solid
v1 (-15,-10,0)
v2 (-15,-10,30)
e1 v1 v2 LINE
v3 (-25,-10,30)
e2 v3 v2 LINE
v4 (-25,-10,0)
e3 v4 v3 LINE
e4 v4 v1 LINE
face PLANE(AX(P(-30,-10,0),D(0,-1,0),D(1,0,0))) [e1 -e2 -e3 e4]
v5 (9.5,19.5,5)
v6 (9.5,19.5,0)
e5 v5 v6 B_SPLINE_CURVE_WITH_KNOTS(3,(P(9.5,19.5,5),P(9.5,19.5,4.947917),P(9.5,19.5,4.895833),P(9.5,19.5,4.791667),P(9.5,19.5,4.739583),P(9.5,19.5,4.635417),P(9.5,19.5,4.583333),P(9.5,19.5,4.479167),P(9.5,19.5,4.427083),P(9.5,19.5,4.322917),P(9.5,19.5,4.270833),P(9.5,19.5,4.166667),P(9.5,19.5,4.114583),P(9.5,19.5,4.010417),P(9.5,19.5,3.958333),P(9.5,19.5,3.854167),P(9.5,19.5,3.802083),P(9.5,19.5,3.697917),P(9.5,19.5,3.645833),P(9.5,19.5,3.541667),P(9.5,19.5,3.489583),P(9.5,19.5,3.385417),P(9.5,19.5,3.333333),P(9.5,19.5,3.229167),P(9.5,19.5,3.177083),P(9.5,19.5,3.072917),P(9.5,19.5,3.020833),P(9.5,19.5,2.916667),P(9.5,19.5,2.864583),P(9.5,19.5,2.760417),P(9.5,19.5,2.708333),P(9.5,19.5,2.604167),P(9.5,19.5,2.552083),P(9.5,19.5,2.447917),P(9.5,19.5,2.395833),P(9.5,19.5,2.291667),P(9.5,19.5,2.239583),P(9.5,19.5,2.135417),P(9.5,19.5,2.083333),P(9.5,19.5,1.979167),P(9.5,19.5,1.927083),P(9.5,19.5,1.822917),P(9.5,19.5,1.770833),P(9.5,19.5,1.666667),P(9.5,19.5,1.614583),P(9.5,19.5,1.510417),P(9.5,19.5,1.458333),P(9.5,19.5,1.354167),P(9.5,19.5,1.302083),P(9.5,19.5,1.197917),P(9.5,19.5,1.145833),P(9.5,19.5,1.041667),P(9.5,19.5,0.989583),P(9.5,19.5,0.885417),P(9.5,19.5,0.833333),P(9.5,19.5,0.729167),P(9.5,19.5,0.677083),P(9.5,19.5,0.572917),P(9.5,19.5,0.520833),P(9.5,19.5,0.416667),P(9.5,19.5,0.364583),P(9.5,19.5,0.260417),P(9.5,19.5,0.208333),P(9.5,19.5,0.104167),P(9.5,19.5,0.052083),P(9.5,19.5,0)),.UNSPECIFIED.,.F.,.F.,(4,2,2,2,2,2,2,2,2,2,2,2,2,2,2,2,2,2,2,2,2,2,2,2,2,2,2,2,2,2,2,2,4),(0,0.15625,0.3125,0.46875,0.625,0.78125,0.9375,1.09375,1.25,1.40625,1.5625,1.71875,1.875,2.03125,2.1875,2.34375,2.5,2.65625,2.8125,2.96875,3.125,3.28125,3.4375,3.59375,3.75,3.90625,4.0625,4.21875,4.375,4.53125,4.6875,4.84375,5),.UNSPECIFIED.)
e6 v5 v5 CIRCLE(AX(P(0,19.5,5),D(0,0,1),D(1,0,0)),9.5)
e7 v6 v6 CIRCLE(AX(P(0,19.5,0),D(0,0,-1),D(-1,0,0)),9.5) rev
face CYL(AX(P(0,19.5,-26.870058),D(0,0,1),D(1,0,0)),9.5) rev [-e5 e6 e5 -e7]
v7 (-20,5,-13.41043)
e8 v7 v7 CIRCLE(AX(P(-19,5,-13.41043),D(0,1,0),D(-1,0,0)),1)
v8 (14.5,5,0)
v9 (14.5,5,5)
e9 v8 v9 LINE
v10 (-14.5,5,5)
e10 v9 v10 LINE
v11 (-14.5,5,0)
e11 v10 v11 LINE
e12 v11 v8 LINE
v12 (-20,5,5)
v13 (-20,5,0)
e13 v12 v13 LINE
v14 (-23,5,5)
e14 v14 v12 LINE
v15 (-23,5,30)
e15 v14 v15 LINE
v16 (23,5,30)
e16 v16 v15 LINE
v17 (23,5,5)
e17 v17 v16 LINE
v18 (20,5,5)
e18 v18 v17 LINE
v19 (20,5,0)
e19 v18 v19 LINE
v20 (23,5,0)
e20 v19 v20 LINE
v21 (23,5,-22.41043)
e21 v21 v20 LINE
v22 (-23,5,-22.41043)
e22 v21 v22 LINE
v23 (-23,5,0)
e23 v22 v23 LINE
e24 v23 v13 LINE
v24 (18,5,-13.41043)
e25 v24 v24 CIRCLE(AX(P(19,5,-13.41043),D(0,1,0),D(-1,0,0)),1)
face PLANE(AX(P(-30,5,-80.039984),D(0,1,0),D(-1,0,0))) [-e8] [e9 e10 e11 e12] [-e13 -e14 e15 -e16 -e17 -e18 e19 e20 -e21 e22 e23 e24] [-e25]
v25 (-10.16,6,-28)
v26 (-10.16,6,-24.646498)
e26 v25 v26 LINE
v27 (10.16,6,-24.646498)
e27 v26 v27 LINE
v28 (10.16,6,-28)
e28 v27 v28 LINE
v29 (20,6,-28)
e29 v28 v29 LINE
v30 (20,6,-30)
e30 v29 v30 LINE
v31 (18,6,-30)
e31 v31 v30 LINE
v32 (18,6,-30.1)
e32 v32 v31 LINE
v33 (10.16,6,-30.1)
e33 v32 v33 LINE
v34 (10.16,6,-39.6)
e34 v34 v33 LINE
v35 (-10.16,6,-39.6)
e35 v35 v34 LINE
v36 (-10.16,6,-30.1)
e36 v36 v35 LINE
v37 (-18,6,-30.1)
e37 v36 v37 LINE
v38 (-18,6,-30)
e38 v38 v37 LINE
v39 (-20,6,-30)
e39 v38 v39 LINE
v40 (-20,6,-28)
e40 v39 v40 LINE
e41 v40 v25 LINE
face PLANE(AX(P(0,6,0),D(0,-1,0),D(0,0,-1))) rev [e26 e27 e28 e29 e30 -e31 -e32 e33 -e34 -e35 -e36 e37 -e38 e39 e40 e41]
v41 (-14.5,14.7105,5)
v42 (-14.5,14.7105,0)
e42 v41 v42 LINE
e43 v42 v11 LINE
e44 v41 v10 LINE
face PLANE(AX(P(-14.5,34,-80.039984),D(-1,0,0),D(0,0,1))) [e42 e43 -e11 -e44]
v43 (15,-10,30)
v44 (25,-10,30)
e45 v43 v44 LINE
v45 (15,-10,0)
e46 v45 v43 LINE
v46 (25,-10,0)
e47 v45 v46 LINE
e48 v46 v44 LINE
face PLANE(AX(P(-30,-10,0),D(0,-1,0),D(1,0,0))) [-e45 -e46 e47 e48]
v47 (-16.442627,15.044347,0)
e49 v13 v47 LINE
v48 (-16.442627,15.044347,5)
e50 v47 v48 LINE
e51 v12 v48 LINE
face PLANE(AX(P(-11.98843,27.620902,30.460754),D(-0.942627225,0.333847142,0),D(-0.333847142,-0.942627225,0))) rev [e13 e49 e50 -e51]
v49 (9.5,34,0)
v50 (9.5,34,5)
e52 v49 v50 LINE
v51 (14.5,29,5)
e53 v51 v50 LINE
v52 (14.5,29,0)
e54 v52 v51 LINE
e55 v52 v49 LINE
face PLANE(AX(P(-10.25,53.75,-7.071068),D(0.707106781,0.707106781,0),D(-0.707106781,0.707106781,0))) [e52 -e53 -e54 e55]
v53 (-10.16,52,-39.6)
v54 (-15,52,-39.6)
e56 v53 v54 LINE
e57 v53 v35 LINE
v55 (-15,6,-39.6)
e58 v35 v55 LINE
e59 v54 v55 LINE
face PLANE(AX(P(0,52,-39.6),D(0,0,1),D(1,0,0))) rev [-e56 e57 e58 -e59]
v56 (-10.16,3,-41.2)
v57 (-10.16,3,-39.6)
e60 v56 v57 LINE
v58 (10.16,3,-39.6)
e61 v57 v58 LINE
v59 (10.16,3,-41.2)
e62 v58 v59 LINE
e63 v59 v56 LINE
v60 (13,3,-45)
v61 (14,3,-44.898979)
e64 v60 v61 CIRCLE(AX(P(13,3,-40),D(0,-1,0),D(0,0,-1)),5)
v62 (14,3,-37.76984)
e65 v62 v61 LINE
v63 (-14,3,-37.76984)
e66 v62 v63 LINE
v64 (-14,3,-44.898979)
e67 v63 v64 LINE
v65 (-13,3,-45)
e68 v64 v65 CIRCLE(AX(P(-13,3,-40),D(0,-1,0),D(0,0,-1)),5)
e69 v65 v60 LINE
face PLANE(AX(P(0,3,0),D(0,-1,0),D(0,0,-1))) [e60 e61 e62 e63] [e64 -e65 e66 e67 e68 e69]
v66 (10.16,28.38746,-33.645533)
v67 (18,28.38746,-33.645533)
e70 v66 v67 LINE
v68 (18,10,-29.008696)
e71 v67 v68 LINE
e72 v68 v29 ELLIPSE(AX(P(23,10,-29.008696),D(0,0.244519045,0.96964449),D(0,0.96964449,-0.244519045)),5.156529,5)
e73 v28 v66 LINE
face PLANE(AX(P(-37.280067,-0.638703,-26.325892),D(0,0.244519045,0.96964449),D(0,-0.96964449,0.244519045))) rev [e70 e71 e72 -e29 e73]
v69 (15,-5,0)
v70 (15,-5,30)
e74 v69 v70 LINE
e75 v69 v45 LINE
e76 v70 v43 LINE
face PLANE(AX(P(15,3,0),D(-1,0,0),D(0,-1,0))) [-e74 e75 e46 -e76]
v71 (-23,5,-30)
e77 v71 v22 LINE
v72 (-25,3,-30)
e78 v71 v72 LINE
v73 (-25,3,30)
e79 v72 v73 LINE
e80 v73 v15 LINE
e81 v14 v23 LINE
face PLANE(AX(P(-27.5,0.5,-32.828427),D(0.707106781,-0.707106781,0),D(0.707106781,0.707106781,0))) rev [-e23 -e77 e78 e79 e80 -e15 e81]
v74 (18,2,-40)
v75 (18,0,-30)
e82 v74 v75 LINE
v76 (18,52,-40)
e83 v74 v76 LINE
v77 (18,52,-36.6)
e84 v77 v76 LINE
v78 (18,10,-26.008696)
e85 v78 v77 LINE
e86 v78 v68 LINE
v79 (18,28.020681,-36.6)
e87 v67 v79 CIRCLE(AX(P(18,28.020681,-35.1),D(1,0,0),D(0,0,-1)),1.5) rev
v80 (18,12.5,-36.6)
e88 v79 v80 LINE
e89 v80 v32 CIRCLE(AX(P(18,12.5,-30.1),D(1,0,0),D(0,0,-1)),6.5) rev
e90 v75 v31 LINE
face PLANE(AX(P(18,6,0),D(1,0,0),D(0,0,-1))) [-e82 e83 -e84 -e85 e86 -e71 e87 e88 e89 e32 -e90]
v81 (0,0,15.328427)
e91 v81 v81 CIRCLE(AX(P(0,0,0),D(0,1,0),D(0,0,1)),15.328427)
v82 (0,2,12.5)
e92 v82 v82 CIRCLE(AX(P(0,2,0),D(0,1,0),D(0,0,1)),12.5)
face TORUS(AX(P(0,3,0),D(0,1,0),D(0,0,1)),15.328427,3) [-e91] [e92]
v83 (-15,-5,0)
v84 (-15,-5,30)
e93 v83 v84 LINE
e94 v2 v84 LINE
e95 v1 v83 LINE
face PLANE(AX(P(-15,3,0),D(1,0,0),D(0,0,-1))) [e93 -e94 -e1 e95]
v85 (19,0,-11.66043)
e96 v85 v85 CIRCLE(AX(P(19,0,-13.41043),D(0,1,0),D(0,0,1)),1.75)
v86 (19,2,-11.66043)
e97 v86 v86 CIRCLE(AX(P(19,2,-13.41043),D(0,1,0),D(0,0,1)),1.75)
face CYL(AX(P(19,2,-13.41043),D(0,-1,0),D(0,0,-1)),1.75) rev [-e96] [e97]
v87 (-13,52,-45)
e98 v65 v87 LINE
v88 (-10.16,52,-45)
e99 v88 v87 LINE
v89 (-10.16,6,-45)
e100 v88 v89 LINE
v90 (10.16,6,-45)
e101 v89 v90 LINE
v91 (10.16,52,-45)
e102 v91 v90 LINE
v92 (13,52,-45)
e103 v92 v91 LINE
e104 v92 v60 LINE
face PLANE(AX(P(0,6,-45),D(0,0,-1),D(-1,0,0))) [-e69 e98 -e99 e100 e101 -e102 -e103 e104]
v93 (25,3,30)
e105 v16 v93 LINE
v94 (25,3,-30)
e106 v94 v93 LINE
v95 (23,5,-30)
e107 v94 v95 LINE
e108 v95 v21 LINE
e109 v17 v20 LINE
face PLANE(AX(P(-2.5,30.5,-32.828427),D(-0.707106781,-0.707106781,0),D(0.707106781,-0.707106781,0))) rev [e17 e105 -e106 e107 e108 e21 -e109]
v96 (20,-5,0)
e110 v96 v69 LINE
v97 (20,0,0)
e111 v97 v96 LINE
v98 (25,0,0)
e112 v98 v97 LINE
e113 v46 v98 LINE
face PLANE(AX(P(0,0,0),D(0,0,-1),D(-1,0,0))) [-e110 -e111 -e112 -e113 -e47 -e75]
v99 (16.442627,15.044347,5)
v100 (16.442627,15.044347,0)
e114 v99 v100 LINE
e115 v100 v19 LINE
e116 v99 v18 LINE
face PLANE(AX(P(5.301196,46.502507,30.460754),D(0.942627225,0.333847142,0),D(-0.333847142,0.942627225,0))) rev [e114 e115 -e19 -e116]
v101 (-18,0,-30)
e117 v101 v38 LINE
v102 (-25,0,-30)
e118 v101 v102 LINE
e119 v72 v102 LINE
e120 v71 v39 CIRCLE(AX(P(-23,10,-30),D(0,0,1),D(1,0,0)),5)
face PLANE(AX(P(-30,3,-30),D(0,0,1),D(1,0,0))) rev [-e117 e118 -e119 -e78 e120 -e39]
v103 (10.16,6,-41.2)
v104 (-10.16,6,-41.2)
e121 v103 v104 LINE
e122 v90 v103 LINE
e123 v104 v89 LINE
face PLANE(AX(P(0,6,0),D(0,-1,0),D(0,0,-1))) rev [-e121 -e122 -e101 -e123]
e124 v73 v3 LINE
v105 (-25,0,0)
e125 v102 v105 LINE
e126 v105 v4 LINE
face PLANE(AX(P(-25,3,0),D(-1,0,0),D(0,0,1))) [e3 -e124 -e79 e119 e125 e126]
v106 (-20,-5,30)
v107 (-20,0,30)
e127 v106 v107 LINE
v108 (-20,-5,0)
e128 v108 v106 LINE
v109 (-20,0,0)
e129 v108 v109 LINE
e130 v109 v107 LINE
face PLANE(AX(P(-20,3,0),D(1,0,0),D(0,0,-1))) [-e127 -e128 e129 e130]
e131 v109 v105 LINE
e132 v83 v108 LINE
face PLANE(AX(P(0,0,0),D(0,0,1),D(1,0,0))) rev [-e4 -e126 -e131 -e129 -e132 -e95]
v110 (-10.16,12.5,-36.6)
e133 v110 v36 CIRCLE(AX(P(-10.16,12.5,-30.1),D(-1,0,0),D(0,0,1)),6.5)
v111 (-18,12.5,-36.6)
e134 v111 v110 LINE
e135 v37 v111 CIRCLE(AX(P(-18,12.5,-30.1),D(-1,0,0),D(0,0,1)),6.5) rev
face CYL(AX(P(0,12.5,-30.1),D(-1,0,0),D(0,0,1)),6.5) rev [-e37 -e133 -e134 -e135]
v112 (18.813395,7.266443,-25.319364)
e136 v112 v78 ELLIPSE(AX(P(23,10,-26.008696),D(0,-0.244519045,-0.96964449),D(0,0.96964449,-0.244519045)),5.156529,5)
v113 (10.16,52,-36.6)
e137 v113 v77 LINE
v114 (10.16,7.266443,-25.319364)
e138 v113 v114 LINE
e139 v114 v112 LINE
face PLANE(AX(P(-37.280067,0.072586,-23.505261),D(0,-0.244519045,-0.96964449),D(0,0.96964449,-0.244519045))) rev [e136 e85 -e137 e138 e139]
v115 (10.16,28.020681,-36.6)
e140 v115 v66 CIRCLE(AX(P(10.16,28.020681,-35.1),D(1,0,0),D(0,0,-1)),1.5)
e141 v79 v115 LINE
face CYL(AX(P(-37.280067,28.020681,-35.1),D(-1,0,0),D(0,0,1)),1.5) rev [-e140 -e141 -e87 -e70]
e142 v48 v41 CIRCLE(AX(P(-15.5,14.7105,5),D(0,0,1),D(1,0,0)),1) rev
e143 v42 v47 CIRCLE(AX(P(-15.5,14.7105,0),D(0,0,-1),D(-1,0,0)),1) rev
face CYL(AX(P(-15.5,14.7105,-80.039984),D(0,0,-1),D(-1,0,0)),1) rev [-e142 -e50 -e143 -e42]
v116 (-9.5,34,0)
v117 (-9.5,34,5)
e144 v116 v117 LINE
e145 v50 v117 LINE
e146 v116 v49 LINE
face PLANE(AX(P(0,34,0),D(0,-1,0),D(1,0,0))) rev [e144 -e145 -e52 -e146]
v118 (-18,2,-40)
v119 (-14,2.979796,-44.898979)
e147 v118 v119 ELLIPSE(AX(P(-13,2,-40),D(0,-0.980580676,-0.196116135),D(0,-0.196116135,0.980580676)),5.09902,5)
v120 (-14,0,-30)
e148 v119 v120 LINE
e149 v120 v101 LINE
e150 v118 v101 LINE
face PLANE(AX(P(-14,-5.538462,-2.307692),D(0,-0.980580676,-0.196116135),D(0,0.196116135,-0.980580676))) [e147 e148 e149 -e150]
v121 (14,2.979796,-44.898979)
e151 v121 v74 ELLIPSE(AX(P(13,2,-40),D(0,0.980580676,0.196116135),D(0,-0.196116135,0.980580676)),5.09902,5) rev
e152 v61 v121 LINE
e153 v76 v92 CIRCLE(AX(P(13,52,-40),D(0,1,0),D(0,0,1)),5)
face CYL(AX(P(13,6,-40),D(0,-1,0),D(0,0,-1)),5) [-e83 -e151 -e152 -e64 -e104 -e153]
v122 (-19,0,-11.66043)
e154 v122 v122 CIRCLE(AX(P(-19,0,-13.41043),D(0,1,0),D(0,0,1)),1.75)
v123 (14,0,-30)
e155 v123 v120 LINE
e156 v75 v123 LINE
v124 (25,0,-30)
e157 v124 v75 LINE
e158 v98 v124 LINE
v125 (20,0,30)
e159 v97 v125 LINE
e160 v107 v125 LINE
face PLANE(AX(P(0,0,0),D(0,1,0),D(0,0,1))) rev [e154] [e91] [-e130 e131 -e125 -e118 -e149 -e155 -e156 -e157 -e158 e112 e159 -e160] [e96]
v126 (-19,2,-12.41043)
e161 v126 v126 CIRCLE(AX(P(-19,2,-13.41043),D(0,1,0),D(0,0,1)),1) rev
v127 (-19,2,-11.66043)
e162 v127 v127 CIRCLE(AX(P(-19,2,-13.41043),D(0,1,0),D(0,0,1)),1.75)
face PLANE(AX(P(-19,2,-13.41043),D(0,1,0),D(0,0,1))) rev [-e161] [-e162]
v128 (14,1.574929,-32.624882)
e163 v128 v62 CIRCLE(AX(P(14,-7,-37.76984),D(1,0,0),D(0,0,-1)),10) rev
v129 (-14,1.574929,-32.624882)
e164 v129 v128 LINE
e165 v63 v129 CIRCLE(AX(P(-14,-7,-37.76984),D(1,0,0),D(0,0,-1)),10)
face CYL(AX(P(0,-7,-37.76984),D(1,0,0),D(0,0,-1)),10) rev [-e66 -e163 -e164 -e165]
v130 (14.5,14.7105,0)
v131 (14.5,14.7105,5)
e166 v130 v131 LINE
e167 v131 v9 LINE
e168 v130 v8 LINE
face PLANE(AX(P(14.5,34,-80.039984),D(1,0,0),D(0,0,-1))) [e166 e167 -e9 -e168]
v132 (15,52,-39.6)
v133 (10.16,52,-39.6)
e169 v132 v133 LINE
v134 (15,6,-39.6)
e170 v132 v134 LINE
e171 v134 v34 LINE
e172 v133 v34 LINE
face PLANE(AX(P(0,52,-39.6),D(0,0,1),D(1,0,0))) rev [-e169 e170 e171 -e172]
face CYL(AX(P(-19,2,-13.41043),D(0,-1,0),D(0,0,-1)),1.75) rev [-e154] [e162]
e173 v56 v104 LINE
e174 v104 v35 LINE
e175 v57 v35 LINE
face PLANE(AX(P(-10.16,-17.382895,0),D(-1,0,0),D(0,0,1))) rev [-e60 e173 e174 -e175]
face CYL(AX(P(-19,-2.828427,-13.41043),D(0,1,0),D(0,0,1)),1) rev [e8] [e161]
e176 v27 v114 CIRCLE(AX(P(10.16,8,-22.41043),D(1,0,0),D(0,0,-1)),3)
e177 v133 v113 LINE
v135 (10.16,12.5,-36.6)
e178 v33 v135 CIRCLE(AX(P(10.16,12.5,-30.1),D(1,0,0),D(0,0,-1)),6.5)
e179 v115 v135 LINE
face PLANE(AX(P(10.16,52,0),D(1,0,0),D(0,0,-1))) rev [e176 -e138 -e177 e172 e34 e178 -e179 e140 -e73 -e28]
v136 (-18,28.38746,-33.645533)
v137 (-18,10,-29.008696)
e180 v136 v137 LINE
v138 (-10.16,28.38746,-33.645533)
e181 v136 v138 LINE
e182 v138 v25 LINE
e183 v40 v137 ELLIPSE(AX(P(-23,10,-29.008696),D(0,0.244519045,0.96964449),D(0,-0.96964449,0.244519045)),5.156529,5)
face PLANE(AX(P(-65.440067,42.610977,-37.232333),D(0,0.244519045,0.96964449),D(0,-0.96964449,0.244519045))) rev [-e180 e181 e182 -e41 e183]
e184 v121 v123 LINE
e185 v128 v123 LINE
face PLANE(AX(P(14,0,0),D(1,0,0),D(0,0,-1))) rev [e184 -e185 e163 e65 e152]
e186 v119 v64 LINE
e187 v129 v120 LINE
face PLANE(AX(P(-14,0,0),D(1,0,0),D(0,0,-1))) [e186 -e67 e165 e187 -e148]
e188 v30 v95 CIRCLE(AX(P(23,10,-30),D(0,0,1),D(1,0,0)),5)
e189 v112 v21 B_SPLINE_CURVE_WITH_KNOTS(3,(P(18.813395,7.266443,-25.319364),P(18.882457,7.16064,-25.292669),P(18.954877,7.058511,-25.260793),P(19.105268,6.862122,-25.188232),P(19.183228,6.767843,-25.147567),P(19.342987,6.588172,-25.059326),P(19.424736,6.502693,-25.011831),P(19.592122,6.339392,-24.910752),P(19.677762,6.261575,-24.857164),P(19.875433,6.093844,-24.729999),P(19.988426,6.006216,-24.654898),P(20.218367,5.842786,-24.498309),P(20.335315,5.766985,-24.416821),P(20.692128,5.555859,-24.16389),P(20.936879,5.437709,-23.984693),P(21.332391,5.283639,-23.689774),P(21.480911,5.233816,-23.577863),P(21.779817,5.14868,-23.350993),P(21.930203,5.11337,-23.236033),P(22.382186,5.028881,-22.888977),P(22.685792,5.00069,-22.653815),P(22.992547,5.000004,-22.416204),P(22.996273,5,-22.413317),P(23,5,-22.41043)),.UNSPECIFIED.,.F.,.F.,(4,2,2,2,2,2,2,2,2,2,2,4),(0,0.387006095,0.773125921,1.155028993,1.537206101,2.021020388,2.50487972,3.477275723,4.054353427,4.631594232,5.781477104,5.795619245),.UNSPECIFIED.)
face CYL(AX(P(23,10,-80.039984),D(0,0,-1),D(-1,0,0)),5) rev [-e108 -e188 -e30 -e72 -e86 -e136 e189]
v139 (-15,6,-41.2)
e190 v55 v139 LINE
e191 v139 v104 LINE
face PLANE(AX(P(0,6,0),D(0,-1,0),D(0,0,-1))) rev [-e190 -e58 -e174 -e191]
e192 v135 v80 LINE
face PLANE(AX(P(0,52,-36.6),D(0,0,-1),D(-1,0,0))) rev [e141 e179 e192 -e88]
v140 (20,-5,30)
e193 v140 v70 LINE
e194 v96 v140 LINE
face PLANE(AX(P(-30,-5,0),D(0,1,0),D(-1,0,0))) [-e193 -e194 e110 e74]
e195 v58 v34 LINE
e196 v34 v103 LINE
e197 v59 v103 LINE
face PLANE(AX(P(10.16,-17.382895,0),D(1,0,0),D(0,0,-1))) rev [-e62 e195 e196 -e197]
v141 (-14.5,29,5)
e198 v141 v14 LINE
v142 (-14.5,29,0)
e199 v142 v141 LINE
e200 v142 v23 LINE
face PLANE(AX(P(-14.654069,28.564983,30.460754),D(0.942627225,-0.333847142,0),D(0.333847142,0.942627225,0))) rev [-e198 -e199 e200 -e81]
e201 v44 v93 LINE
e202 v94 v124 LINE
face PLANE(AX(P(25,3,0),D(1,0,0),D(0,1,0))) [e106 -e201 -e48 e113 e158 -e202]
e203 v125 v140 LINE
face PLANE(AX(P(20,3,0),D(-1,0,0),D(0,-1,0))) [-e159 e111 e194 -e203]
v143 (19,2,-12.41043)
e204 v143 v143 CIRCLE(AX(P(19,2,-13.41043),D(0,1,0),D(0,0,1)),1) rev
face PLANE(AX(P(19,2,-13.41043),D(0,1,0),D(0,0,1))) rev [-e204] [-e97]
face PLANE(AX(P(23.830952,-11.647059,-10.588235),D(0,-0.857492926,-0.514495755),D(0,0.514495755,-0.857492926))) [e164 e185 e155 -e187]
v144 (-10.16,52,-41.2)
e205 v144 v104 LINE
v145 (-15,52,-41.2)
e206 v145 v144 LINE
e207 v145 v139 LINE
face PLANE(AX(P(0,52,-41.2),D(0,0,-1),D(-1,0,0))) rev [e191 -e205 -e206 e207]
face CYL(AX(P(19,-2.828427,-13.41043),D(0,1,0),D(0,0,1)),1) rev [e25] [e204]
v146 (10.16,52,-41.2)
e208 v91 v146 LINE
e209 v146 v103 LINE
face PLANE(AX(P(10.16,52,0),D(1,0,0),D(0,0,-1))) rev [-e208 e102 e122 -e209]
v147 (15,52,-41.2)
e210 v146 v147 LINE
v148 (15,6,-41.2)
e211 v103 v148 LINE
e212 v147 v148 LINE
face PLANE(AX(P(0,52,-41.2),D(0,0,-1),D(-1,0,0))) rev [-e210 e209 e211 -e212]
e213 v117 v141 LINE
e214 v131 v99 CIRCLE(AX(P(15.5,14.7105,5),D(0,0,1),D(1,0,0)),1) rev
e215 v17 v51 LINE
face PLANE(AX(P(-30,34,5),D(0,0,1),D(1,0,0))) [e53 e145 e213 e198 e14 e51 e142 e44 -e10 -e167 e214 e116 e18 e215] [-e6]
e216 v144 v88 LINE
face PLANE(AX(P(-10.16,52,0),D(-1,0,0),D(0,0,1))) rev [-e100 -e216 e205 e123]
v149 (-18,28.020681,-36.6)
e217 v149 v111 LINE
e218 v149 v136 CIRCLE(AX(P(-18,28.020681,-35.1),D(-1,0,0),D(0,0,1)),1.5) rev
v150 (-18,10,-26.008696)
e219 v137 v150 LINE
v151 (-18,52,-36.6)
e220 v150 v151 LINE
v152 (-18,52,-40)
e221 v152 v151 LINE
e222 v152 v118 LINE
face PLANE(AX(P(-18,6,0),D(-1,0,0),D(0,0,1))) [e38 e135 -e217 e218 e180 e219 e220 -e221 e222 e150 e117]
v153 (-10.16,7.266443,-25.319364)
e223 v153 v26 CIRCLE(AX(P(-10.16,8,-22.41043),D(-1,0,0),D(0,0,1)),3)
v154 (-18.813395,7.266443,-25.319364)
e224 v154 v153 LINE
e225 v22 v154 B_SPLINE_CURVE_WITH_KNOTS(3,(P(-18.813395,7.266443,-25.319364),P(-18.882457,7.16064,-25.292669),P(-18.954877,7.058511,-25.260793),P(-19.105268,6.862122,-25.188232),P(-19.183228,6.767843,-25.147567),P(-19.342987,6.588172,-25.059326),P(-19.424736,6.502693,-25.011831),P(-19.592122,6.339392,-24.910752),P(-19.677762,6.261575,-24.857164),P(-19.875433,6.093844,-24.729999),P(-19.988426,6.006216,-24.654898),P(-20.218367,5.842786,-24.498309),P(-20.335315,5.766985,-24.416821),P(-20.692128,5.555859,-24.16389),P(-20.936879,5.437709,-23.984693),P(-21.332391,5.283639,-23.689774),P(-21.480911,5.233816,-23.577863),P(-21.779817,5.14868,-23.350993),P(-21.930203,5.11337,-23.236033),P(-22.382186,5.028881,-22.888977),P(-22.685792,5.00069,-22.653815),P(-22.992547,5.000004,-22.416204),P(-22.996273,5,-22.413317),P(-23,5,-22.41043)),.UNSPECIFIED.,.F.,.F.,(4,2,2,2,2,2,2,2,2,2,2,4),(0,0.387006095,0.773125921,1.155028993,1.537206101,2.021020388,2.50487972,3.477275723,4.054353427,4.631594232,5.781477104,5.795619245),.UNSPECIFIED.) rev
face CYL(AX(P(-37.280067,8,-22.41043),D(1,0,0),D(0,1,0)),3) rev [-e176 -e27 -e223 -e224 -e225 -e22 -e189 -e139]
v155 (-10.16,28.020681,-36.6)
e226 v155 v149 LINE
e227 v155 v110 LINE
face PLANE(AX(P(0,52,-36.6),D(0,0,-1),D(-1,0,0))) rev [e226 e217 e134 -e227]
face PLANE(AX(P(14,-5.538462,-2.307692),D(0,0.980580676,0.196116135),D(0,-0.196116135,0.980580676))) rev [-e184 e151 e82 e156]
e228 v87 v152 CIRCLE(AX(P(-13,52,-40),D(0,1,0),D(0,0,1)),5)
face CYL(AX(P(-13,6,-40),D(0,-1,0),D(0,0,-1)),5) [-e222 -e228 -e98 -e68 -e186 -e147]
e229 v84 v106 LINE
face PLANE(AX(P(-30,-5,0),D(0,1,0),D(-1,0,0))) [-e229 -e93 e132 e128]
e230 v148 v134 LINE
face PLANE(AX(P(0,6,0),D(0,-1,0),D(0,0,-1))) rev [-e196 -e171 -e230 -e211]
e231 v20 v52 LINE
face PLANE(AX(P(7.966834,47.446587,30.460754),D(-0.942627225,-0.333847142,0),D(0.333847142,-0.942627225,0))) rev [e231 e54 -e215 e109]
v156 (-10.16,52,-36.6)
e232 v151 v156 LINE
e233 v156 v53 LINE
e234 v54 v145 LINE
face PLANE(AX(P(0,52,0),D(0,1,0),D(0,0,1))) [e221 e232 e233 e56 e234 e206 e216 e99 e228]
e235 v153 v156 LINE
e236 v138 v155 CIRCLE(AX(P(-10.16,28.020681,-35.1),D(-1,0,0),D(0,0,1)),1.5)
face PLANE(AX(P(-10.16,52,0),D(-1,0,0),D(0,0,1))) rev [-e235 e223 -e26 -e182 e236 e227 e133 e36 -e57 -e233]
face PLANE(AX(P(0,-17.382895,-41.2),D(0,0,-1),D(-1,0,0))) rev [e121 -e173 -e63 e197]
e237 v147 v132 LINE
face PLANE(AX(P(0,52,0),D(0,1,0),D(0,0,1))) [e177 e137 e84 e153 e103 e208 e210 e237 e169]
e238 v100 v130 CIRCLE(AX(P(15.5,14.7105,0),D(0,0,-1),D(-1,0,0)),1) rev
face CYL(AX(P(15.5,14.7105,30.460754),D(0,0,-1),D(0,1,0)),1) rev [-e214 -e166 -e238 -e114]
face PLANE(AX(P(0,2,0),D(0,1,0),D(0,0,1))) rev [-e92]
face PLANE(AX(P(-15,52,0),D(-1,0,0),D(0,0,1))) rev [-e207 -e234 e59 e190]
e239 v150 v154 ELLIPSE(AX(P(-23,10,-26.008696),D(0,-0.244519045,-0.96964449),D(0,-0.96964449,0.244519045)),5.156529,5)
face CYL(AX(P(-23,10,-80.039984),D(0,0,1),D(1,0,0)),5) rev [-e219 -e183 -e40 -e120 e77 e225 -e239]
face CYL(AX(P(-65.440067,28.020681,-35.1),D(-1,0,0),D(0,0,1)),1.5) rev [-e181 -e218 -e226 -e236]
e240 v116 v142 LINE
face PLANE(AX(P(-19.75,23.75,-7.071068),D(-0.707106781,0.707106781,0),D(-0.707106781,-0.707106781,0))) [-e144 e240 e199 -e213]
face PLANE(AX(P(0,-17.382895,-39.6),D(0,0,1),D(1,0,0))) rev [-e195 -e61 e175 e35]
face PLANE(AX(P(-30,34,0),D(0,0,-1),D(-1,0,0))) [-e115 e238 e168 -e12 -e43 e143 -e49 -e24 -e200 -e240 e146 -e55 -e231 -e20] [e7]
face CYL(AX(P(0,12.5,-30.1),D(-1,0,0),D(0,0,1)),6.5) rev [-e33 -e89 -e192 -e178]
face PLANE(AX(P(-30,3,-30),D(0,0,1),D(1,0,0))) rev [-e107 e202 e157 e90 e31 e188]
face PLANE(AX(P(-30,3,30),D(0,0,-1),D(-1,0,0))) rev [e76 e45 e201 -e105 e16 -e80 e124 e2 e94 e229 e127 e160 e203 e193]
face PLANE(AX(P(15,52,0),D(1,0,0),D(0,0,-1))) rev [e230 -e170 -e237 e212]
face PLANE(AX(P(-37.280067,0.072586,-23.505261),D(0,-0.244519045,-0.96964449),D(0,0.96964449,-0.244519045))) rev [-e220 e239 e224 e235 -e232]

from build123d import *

# Parameters (mm, degrees)
SKETCH_2_W           = 60
SKETCH_2_H           = 60
EXTRUDE_1_DEPTH      = 3
EXTRUDE_START        = 30
EXTRUDE_3_DEPTH      = 30
EXTRUDE_START_2      = 3
SKETCH_8_W           = 36
SKETCH_8_H           = 20
EXTRUDE_4_DEPTH      = 3
CUT_EXTRUDE_START    = 6
SKETCH_10_W          = 20.32
SKETCH_10_H          = 1.6
CUT_EXTRUDE_2_DEPTH  = 3
EXTRUDE_START_3      = 6
EXTRUDE_5_DEPTH      = 46
EXTRUDE_START_4      = -18
EXTRUDE_6_DEPTH      = 36
EXTRUDE_START_5      = 18
EXTRUDE_8_DEPTH      = 7.84
EXTRUDE_START_6      = -10.16
EXTRUDE_9_DEPTH      = 7.84
EXTRUDE_10_DEPTH     = 36
SKETCH_16_W          = 5
SKETCH_16_H          = 60
CUT_EXTRUDE_3_DEPTH  = 3
EXTRUDE_11_DEPTH     = 4
EXTRUDE_12_DEPTH     = 4
FILLET_3_R           = 5
FILLET_4_R           = 10
SKETCH_22_W          = 50
SKETCH_22_H          = 2
EXTRUDE_14_DEPTH     = 60
CUT_EXTRUDE_START_2  = 30
CUT_EXTRUDE_4_DEPTH  = 60
SKETCH_26_R          = 12.5
CUT_EXTRUDE_6_DEPTH  = 2
FILLET_5_R           = 3
FILLET_7_R           = 5
FILLET_8_R           = 6.5
FILLET_9_R           = 1.5
FILLET_10_R          = 3
EXTRUDE_START_7      = 5
SKETCH_27_W          = 29
SKETCH_27_H          = 5
EXTRUDE_15_DEPTH     = 29
CUT_EXTRUDE_START_3  = 5
SKETCH_28_R          = 9.5
CUT_EXTRUDE_7_DEPTH  = 5
CUT_EXTRUDE_8_DEPTH  = 5
EXTRUDE_16_DEPTH     = 5
FILLET_11_R          = 1
SKETCH_31_R          = 1
CUT_EXTRUDE_9_DEPTH  = 5
SKETCH_32_R          = 1.75
CUT_EXTRUDE_10_DEPTH = 2


with BuildPart() as part:
    # 草图2 → 凸台-拉伸1 (new body)
    with BuildSketch(Plane(origin=(0, 0, 0), x_dir=(1, 0, 0), z_dir=(0, 1, 0))):
        Rectangle(SKETCH_2_W, SKETCH_2_H)
    extrude(amount=EXTRUDE_1_DEPTH)

    # 草图7 → 凸台-拉伸3 (add)
    with BuildSketch(Plane.XY.offset(EXTRUDE_START)):
        Polygon((-25, 0), (-25, -10), (-15, -10), (-15, -5), (-20, -5), (-20, 0), align=None)
        Polygon((20, 0), (25, 0), (25, -10), (15, -10), (15, -5), (20, -5), align=None)
    extrude(amount=-EXTRUDE_3_DEPTH)

    # 草图8 → 凸台-拉伸4 (add)
    with BuildSketch(Plane(origin=(0, 0, 0), x_dir=(1, 0, 0), z_dir=(0, 1, 0)).offset(EXTRUDE_START_2)):
        with Locations((0, 35)):
            Rectangle(SKETCH_8_W, SKETCH_8_H)
    extrude(amount=EXTRUDE_4_DEPTH)

    # 草图10 → 切除-拉伸2 (cut)
    with BuildSketch(Plane(origin=(0, 0, 0), x_dir=(1, 0, 0), z_dir=(0, 1, 0)).offset(CUT_EXTRUDE_START)):
        with Locations((0, 40.4)):
            Rectangle(SKETCH_10_W, SKETCH_10_H)
    extrude(amount=-CUT_EXTRUDE_2_DEPTH, mode=Mode.SUBTRACT)

    # 草图11 → 凸台-拉伸5 (add)
    with BuildSketch(Plane(origin=(0, 0, 0), x_dir=(1, 0, 0), z_dir=(0, 1, 0)).offset(EXTRUDE_START_3)):
        Polygon((10.16, 41.2), (10.16, 45), (18, 45), (18, 36.6), (10.16, 36.6), (10.16, 39.6), (15, 39.6), (15, 41.2), align=None)
        Polygon((-15, 41.2), (-15, 39.6), (-10.16, 39.6), (-10.16, 36.6), (-18, 36.6), (-18, 45), (-10.16, 45), (-10.16, 41.2), align=None)
    extrude(amount=EXTRUDE_5_DEPTH)

    # 草图12 → 凸台-拉伸6 (add)
    with BuildSketch(Plane(origin=(0, 0, 0), x_dir=(0, 0, -1), z_dir=(1, 0, 0)).offset(EXTRUDE_START_4)):
        Polygon((30, 0), (35, 3), (30, 3), align=None)
    extrude(amount=EXTRUDE_6_DEPTH)

    # 草图13 → 凸台-拉伸8 (add)
    with BuildSketch(Plane(origin=(0, 0, 0), x_dir=(0, 0, -1), z_dir=(1, 0, 0)).offset(EXTRUDE_START_5)):
        Polygon((25, 6), (36.6, 52), (36.6, 40.103448276), (28, 6), align=None)
    extrude(amount=-EXTRUDE_8_DEPTH)

    # 草图14 → 凸台-拉伸9 (add)
    with BuildSketch(Plane(origin=(0, 0, 0), x_dir=(0, 0, -1), z_dir=(1, 0, 0)).offset(EXTRUDE_START_6)):
        Polygon((36.6, 52), (25, 6), (28, 6), (36.6, 40.103448276), align=None)
    extrude(amount=-EXTRUDE_9_DEPTH)

    # 草图15 → 凸台-拉伸10 (add)
    with BuildSketch(Plane(origin=(0, 0, 0), x_dir=(0, 0, -1), z_dir=(1, 0, 0)).offset(EXTRUDE_START_4)):
        Polygon((25, 3), (24.243478261, 3), (25, 6), align=None)
    extrude(amount=EXTRUDE_10_DEPTH)

    # 草图16 → 切除-拉伸3 (cut)
    with BuildSketch(Plane(origin=(0, 0, 0), x_dir=(1, 0, 0), z_dir=(0, 1, 0))):
        with Locations((27.5, 0)):
            Rectangle(SKETCH_16_W, SKETCH_16_H)
        with Locations((-27.5, 0)):
            Rectangle(SKETCH_16_W, SKETCH_16_H)
    extrude(amount=CUT_EXTRUDE_3_DEPTH, mode=Mode.SUBTRACT)

    # 草图17 → 凸台-拉伸11 (add)
    with BuildSketch(Plane(origin=(0, 0, 0), x_dir=(0, 0, -1), z_dir=(1, 0, 0)).offset(EXTRUDE_START_5)):
        Polygon((30, 0), (45, 3), (30, 3), align=None)
    extrude(amount=-EXTRUDE_11_DEPTH)

    # 草图18 → 凸台-拉伸12 (add)
    with BuildSketch(Plane(origin=(0, 0, 0), x_dir=(0, 0, -1), z_dir=(1, 0, 0)).offset(EXTRUDE_START_4)):
        Polygon((30, 0), (30, 3), (45, 3), align=None)
    extrude(amount=EXTRUDE_12_DEPTH)

    # 圆角3
    # the kernel refuses this fillet: 5 mm, written as the material it takes off along each edge
    with BuildSketch(Plane(origin=(18, -9.5, -45), x_dir=(0, 0, 1), z_dir=(0, 1, 0)), Plane(origin=(-18, 64.5, -45), x_dir=(0, 0, 1), z_dir=(0, -1, 0))) as fillet_3_piece_1:
        with BuildLine():
            CenterArc((FILLET_3_R, -FILLET_3_R), FILLET_3_R, 90, 90)
            Line((0, -FILLET_3_R), (0, 0))
            Line((0, 0), (FILLET_3_R, 0))
        make_face()
    extrude(amount=74, mode=Mode.SUBTRACT)

    # 圆角4
    fillet_4_edges = [part.edges().sort_by_distance(p)[0] for p in [
        (0, 3, -35),
    ]]
    fillet(fillet_4_edges, radius=FILLET_4_R)

    # 草图22 → 凸台-拉伸14 (add)
    with BuildSketch(Plane.XY.offset(EXTRUDE_START)):
        with Locations((0, 4)):
            Rectangle(SKETCH_22_W, SKETCH_22_H)
    extrude(amount=-EXTRUDE_14_DEPTH)

    # 草图24 → 切除-拉伸4 (cut)
    with BuildSketch(Plane.XY.offset(CUT_EXTRUDE_START_2)):
        Polygon((-25, 5), (-23, 5), (-25, 3), align=None)
        Polygon((25, 5), (25, 3), (23, 5), align=None)
    extrude(amount=-CUT_EXTRUDE_4_DEPTH, mode=Mode.SUBTRACT)

    # 草图26 → 切除-拉伸6 (cut)
    with BuildSketch(Plane(origin=(0, 0, 0), x_dir=(1, 0, 0), z_dir=(0, 1, 0))):
        with Locations(Location((0, 0, 0), (0, 0, 270))):
            Circle(SKETCH_26_R)
    extrude(amount=CUT_EXTRUDE_6_DEPTH, mode=Mode.SUBTRACT)

    # 圆角5
    # the kernel refuses this fillet: 3 mm, written as the material it takes off along each edge
    with BuildSketch(Plane(origin=(0, 0, 0), x_dir=(0, 0, 1), z_dir=(-1, 0, 0))) as fillet_5_piece_1:
        with BuildLine():
            CenterArc((15.328427125, 3), FILLET_5_R, 199.471220634, 70.528779366)
            Line((12.5, 2), (12.443431458, 1.98))
            ThreePointArc((12.443431458, 1.98), (12.44, 1), (12.44, 0))
            Line((12.44, 0), (12.5, -0.06))
            Line((12.5, -0.06), (15.328427125, -0.06))
            Line((15.328427125, -0.06), (15.328427125, 0))
        make_face()
    revolve(axis=Axis((0, 0, 0), (0, 1, 0)), mode=Mode.SUBTRACT)

    # 圆角7
    # the kernel refuses this fillet: 5 mm, written as the material it adds along each edge
    with BuildSketch(Plane(origin=(-18, 5, -12.247826087), x_dir=(0, 1, 0), z_dir=(0, 0, -1))) as fillet_7_piece_1_section:
        with BuildLine():
            CenterArc((FILLET_7_R, -FILLET_7_R), FILLET_7_R, 90, 90)
            Line((0, -FILLET_7_R), (0, 0))
            Line((0, 0), (FILLET_7_R, 0))
        make_face()
    fillet_7_piece_1 = extrude(amount=30.252173913, mode=Mode.PRIVATE)
    fillet_7_piece_1 = split(fillet_7_piece_1, bisect_by=Plane(origin=(-18.571810287, 7.311264389, -25.330666672), z_dir=(0, -0.24451904524274018, -0.9696444897556934)), keep=Keep.TOP, mode=Mode.PRIVATE)
    fillet_7_piece_1 = split(fillet_7_piece_1, bisect_by=Plane(origin=(-18.571810287, 6.599974755, -28.151297982), z_dir=(0, 0.24451904524274015, 0.9696444897556934)), keep=Keep.TOP, mode=Mode.PRIVATE)
    add(fillet_7_piece_1)
    with BuildSketch(Plane(origin=(-18, 5, -12.247826087), x_dir=(0, 1, 0), z_dir=(0, 0, -1))) as fillet_7_piece_2_section:
        with BuildLine():
            CenterArc((FILLET_7_R, -FILLET_7_R), FILLET_7_R, 90, 90)
            Line((0, -FILLET_7_R), (0, 0))
            Line((0, 0), (FILLET_7_R, 0))
        make_face()
    fillet_7_piece_2 = extrude(amount=17.752173913, mode=Mode.PRIVATE)
    fillet_7_piece_2 = split(fillet_7_piece_2, bisect_by=Plane(origin=(-19.572975188, 6, -28.927333211), z_dir=(0, -1, 0)), keep=Keep.TOP, mode=Mode.PRIVATE)
    fillet_7_piece_2 = split(fillet_7_piece_2, bisect_by=Plane(origin=(-19.572975188, 5.678002788, -27.918800703), z_dir=(0, -0.24451904524274015, -0.9696444897556934)), keep=Keep.TOP, mode=Mode.PRIVATE)
    add(fillet_7_piece_2)
    with BuildSketch(Plane(origin=(18, 5, -30), x_dir=(1, 0, 0), z_dir=(0, 0, 1))) as fillet_7_piece_3_section:
        with BuildLine():
            CenterArc((FILLET_7_R, FILLET_7_R), FILLET_7_R, 180, 90)
            Line((0, FILLET_7_R), (0, 0))
            Line((0, 0), (FILLET_7_R, 0))
        make_face()
    fillet_7_piece_3 = extrude(amount=17.752173913, mode=Mode.PRIVATE)
    fillet_7_piece_3 = split(fillet_7_piece_3, bisect_by=Plane(origin=(19.572975189, 6, -28.92733321), z_dir=(0, -1, 0)), keep=Keep.TOP, mode=Mode.PRIVATE)
    fillet_7_piece_3 = split(fillet_7_piece_3, bisect_by=Plane(origin=(19.572975189, 6.389292423, -25.098169394), z_dir=(0, -0.24451904524274018, -0.9696444897556934)), keep=Keep.TOP, mode=Mode.PRIVATE)
    add(fillet_7_piece_3)
    with BuildSketch(Plane(origin=(18, 5, -42.5), x_dir=(1, 0, 0), z_dir=(0, 0, 1))) as fillet_7_piece_4_section:
        with BuildLine():
            CenterArc((FILLET_7_R, FILLET_7_R), FILLET_7_R, 180, 90)
            Line((0, FILLET_7_R), (0, 0))
            Line((0, 0), (FILLET_7_R, 0))
        make_face()
    fillet_7_piece_4 = extrude(amount=30.252173913, mode=Mode.PRIVATE)
    fillet_7_piece_4 = split(fillet_7_piece_4, bisect_by=Plane(origin=(18.571810287, 7.311264389, -25.330666672), z_dir=(0, -0.24451904524274018, -0.9696444897556934)), keep=Keep.TOP, mode=Mode.PRIVATE)
    fillet_7_piece_4 = split(fillet_7_piece_4, bisect_by=Plane(origin=(18.571810287, 6.599974754, -28.151297982), z_dir=(0, 0.24451904524274015, 0.9696444897556934)), keep=Keep.TOP, mode=Mode.PRIVATE)
    add(fillet_7_piece_4)

    # 圆角8
    fillet_8_edges = [part.edges().sort_by_distance(p)[0] for p in [
        (14.08, 6, -36.6),
        (-14.08, 6, -36.6),
    ]]
    fillet(fillet_8_edges, radius=FILLET_8_R)

    # 圆角9
    fillet_9_edges = [part.edges().sort_by_distance(p)[0] for p in [
        (14.08, 40.103448276, -36.6),
        (-14.08, 40.103448276, -36.6),
    ]]
    fillet(fillet_9_edges, radius=FILLET_9_R)

    # 圆角10
    # the kernel refuses this fillet: 3 mm, written as the material it adds along each edge
    with BuildSketch(Plane(origin=(-28.843489259, 5, -24.747826087), x_dir=(-2.8138525512499648e-15, 0.9696444897556498, -0.24451904524291254), z_dir=(1, 0, 0))) as fillet_10_piece_1_section:
        with BuildLine():
            CenterArc((FILLET_10_R * 0.779131901165, FILLET_10_R), FILLET_10_R, 194.153412588, 75.846587412)
            Line((-FILLET_10_R * 0.190512588591, FILLET_10_R * 0.755480954757), (0, 0))
            Line((0, 0), (FILLET_10_R * 0.779131901165, 0))
        make_face()
    fillet_10_piece_1 = extrude(amount=57.686978517, mode=Mode.PRIVATE)
    fillet_10_piece_1 = split(fillet_10_piece_1, bisect_by=Plane(origin=(-15.866529779, 6, -24.192724601), z_dir=(0, -1, 0)), keep=Keep.TOP, mode=Mode.PRIVATE)
    fillet_10_piece_1 = fillet_10_piece_1 - Plane(origin=(-23, 10, -24.192724601), x_dir=(0, 1, 0), z_dir=(0, 0, 1)) * Cylinder(5, 125, mode=Mode.PRIVATE)
    fillet_10_piece_1 = split(fillet_10_piece_1, bisect_by=Plane(origin=(-10.16, 5.299241574, -24.192724601), z_dir=(-1, 0, 0)), keep=Keep.TOP, mode=Mode.PRIVATE)
    fillet_10_piece_1 = split(fillet_10_piece_1, bisect_by=Plane(origin=(-19.283644102, 8.716355898, -24.192724601), z_dir=(0.7071067811865488, -0.7071067811865462, 0)), keep=Keep.TOP, mode=Mode.PRIVATE)
    add(fillet_10_piece_1)
    with BuildSketch(Plane(origin=(-28.843489259, 5, -24.747826087), x_dir=(-2.8138525512499648e-15, 0.9696444897556498, -0.24451904524291254), z_dir=(1, 0, 0))) as fillet_10_piece_2_section:
        with BuildLine():
            CenterArc((FILLET_10_R * 0.779131901165, FILLET_10_R), FILLET_10_R, 194.153412588, 75.846587412)
            Line((-FILLET_10_R * 0.190512588591, FILLET_10_R * 0.755480954757), (0, 0))
            Line((0, 0), (FILLET_10_R * 0.779131901165, 0))
        make_face()
    fillet_10_piece_2 = extrude(amount=57.686978517, mode=Mode.PRIVATE)
    fillet_10_piece_2 = split(fillet_10_piece_2, bisect_by=Plane(origin=(-14.854595225, 6, -25.046116775), z_dir=(0, 1, 0)), keep=Keep.TOP, mode=Mode.PRIVATE)
    fillet_10_piece_2 = fillet_10_piece_2 - Plane(origin=(-23, 10, -25.046116775), x_dir=(0, 1, 0), z_dir=(0, 0, 1)) * Cylinder(5, 125, mode=Mode.PRIVATE)
    fillet_10_piece_2 = split(fillet_10_piece_2, bisect_by=Plane(origin=(-10.16, 6.410540932, -25.046116775), z_dir=(-1, 0, 0)), keep=Keep.TOP, mode=Mode.PRIVATE)
    fillet_10_piece_2 = split(fillet_10_piece_2, bisect_by=Plane(origin=(-18.222027147, 9.777972853, -25.046116775), z_dir=(0.7071067811865488, -0.7071067811865462, 0)), keep=Keep.TOP, mode=Mode.PRIVATE)
    add(fillet_10_piece_2)
    with BuildSketch(Plane(origin=(-28.843489259, 5, -24.747826087), x_dir=(-2.8138525512499648e-15, 0.9696444897556498, -0.24451904524291254), z_dir=(1, 0, 0))) as fillet_10_piece_3_section:
        with BuildLine():
            CenterArc((FILLET_10_R * 0.779131901165, FILLET_10_R), FILLET_10_R, 194.153412588, 75.846587412)
            Line((-FILLET_10_R * 0.190512588591, FILLET_10_R * 0.755480954757), (0, 0))
            Line((0, 0), (FILLET_10_R * 0.779131901165, 0))
        make_face()
    fillet_10_piece_3 = extrude(amount=57.686978517, mode=Mode.PRIVATE)
    fillet_10_piece_3 = split(fillet_10_piece_3, bisect_by=Plane(origin=(0, 6, -24.222418931), z_dir=(0, -1, 0)), keep=Keep.TOP, mode=Mode.PRIVATE)
    fillet_10_piece_3 = split(fillet_10_piece_3, bisect_by=Plane(origin=(-10.16, 5.321349944, -24.222418931), z_dir=(1, 0, 0)), keep=Keep.TOP, mode=Mode.PRIVATE)
    fillet_10_piece_3 = split(fillet_10_piece_3, bisect_by=Plane(origin=(10.16, 5.321349944, -24.222418931), z_dir=(-1, 0, 0)), keep=Keep.TOP, mode=Mode.PRIVATE)
    add(fillet_10_piece_3)
    with BuildSketch(Plane(origin=(-28.843489259, 5, -24.747826087), x_dir=(-2.8138525512499648e-15, 0.9696444897556498, -0.24451904524291254), z_dir=(1, 0, 0))) as fillet_10_piece_4_section:
        with BuildLine():
            CenterArc((FILLET_10_R * 0.779131901165, FILLET_10_R), FILLET_10_R, 194.153412588, 75.846587412)
            Line((-FILLET_10_R * 0.190512588591, FILLET_10_R * 0.755480954757), (0, 0))
            Line((0, 0), (FILLET_10_R * 0.779131901165, 0))
        make_face()
    fillet_10_piece_4 = extrude(amount=57.686978517, mode=Mode.PRIVATE)
    fillet_10_piece_4 = split(fillet_10_piece_4, bisect_by=Plane(origin=(15.866529778, 6, -24.192724601), z_dir=(0, -1, 0)), keep=Keep.TOP, mode=Mode.PRIVATE)
    fillet_10_piece_4 = fillet_10_piece_4 - Plane(origin=(23, 10, -24.192724601), x_dir=(1, 0, 0), z_dir=(0, 0, -1)) * Cylinder(5, 125, mode=Mode.PRIVATE)
    fillet_10_piece_4 = split(fillet_10_piece_4, bisect_by=Plane(origin=(10.16, 5.299241574, -24.192724601), z_dir=(1, 0, 0)), keep=Keep.TOP, mode=Mode.PRIVATE)
    fillet_10_piece_4 = split(fillet_10_piece_4, bisect_by=Plane(origin=(19.283644102, 8.716355898, -24.192724601), z_dir=(-0.7071067811865306, -0.7071067811865644, 0)), keep=Keep.TOP, mode=Mode.PRIVATE)
    add(fillet_10_piece_4)
    with BuildSketch(Plane(origin=(-28.843489259, 5, -24.747826087), x_dir=(-2.8138525512499648e-15, 0.9696444897556498, -0.24451904524291254), z_dir=(1, 0, 0))) as fillet_10_piece_5_section:
        with BuildLine():
            CenterArc((FILLET_10_R * 0.779131901165, FILLET_10_R), FILLET_10_R, 194.153412588, 75.846587412)
            Line((-FILLET_10_R * 0.190512588591, FILLET_10_R * 0.755480954757), (0, 0))
            Line((0, 0), (FILLET_10_R * 0.779131901165, 0))
        make_face()
    fillet_10_piece_5 = extrude(amount=57.686978517, mode=Mode.PRIVATE)
    fillet_10_piece_5 = split(fillet_10_piece_5, bisect_by=Plane(origin=(14.854595225, 6, -25.046116775), z_dir=(0, 1, 0)), keep=Keep.TOP, mode=Mode.PRIVATE)
    fillet_10_piece_5 = fillet_10_piece_5 - Plane(origin=(23, 10, -25.046116775), x_dir=(1, 0, 0), z_dir=(0, 0, -1)) * Cylinder(5, 125, mode=Mode.PRIVATE)
    fillet_10_piece_5 = split(fillet_10_piece_5, bisect_by=Plane(origin=(10.16, 6.410540932, -25.046116775), z_dir=(1, 0, 0)), keep=Keep.TOP, mode=Mode.PRIVATE)
    fillet_10_piece_5 = split(fillet_10_piece_5, bisect_by=Plane(origin=(18.222027147, 9.777972853, -25.046116775), z_dir=(-0.7071067811865306, -0.7071067811865644, 0)), keep=Keep.TOP, mode=Mode.PRIVATE)
    add(fillet_10_piece_5)

    # 草图27 → 凸台-拉伸15 (add)
    with BuildSketch(Plane(origin=(0, 0, 0), x_dir=(1, 0, 0), z_dir=(0, 1, 0)).offset(EXTRUDE_START_7)):
        with Locations((0, -2.5)):
            Rectangle(SKETCH_27_W, SKETCH_27_H)
    extrude(amount=EXTRUDE_15_DEPTH)

    # 草图28 → 切除-拉伸7 (cut)
    with BuildSketch(Plane.XY.offset(CUT_EXTRUDE_START_3)):
        with Locations((0, 19.5)):
            Circle(SKETCH_28_R)
    extrude(amount=-CUT_EXTRUDE_7_DEPTH, mode=Mode.SUBTRACT)

    # 草图29 → 切除-拉伸8 (cut)
    with BuildSketch(Plane.XY.offset(CUT_EXTRUDE_START_3)):
        Polygon((-14.5, 34), (-9.5, 34), (-14.5, 29), align=None)
        Polygon((14.5, 34), (9.5, 34), (14.5, 29), align=None)
    extrude(amount=-CUT_EXTRUDE_8_DEPTH, mode=Mode.SUBTRACT)

    # 草图30 → 凸台-拉伸16 (add)
    with BuildSketch(Plane.XY):
        Polygon((-23, 5), (-14.5, 29), (-14.5, 20.529411765), (-20, 5), align=None)
        Polygon((20, 5), (23, 5), (14.5, 29), (14.5, 20.529411765), align=None)
    extrude(amount=EXTRUDE_16_DEPTH)

    # 圆角11
    fillet_11_edges = [part.edges().sort_by_distance(p)[0] for p in [
        (-14.5, 20.529411765, 2.5),
        (14.5, 20.529411765, 2.5),
    ]]
    fillet(fillet_11_edges, radius=FILLET_11_R)

    # 草图31 → 切除-拉伸9 (cut)
    with BuildSketch(Plane(origin=(0, 0, 0), x_dir=(1, 0, 0), z_dir=(0, 1, 0)).offset(CUT_EXTRUDE_START_3)):
        with Locations(Location((-19, 13.410430383, 0), (0, 0, 270))):
            Circle(SKETCH_31_R)
        with Locations(Location((19, 13.410430383, 0), (0, 0, 270))):
            Circle(SKETCH_31_R)
    extrude(amount=-CUT_EXTRUDE_9_DEPTH, mode=Mode.SUBTRACT)

    # 草图32 → 切除-拉伸10 (cut)
    with BuildSketch(Plane(origin=(0, 0, 0), x_dir=(1, 0, 0), z_dir=(0, 1, 0))):
        with Locations(Location((19, 13.410430383, 0), (0, 0, 270))):
            Circle(SKETCH_32_R)
        with Locations(Location((-19, 13.410430383, 0), (0, 0, 270))):
            Circle(SKETCH_32_R)
    extrude(amount=CUT_EXTRUDE_10_DEPTH, mode=Mode.SUBTRACT)


solid = part.part
